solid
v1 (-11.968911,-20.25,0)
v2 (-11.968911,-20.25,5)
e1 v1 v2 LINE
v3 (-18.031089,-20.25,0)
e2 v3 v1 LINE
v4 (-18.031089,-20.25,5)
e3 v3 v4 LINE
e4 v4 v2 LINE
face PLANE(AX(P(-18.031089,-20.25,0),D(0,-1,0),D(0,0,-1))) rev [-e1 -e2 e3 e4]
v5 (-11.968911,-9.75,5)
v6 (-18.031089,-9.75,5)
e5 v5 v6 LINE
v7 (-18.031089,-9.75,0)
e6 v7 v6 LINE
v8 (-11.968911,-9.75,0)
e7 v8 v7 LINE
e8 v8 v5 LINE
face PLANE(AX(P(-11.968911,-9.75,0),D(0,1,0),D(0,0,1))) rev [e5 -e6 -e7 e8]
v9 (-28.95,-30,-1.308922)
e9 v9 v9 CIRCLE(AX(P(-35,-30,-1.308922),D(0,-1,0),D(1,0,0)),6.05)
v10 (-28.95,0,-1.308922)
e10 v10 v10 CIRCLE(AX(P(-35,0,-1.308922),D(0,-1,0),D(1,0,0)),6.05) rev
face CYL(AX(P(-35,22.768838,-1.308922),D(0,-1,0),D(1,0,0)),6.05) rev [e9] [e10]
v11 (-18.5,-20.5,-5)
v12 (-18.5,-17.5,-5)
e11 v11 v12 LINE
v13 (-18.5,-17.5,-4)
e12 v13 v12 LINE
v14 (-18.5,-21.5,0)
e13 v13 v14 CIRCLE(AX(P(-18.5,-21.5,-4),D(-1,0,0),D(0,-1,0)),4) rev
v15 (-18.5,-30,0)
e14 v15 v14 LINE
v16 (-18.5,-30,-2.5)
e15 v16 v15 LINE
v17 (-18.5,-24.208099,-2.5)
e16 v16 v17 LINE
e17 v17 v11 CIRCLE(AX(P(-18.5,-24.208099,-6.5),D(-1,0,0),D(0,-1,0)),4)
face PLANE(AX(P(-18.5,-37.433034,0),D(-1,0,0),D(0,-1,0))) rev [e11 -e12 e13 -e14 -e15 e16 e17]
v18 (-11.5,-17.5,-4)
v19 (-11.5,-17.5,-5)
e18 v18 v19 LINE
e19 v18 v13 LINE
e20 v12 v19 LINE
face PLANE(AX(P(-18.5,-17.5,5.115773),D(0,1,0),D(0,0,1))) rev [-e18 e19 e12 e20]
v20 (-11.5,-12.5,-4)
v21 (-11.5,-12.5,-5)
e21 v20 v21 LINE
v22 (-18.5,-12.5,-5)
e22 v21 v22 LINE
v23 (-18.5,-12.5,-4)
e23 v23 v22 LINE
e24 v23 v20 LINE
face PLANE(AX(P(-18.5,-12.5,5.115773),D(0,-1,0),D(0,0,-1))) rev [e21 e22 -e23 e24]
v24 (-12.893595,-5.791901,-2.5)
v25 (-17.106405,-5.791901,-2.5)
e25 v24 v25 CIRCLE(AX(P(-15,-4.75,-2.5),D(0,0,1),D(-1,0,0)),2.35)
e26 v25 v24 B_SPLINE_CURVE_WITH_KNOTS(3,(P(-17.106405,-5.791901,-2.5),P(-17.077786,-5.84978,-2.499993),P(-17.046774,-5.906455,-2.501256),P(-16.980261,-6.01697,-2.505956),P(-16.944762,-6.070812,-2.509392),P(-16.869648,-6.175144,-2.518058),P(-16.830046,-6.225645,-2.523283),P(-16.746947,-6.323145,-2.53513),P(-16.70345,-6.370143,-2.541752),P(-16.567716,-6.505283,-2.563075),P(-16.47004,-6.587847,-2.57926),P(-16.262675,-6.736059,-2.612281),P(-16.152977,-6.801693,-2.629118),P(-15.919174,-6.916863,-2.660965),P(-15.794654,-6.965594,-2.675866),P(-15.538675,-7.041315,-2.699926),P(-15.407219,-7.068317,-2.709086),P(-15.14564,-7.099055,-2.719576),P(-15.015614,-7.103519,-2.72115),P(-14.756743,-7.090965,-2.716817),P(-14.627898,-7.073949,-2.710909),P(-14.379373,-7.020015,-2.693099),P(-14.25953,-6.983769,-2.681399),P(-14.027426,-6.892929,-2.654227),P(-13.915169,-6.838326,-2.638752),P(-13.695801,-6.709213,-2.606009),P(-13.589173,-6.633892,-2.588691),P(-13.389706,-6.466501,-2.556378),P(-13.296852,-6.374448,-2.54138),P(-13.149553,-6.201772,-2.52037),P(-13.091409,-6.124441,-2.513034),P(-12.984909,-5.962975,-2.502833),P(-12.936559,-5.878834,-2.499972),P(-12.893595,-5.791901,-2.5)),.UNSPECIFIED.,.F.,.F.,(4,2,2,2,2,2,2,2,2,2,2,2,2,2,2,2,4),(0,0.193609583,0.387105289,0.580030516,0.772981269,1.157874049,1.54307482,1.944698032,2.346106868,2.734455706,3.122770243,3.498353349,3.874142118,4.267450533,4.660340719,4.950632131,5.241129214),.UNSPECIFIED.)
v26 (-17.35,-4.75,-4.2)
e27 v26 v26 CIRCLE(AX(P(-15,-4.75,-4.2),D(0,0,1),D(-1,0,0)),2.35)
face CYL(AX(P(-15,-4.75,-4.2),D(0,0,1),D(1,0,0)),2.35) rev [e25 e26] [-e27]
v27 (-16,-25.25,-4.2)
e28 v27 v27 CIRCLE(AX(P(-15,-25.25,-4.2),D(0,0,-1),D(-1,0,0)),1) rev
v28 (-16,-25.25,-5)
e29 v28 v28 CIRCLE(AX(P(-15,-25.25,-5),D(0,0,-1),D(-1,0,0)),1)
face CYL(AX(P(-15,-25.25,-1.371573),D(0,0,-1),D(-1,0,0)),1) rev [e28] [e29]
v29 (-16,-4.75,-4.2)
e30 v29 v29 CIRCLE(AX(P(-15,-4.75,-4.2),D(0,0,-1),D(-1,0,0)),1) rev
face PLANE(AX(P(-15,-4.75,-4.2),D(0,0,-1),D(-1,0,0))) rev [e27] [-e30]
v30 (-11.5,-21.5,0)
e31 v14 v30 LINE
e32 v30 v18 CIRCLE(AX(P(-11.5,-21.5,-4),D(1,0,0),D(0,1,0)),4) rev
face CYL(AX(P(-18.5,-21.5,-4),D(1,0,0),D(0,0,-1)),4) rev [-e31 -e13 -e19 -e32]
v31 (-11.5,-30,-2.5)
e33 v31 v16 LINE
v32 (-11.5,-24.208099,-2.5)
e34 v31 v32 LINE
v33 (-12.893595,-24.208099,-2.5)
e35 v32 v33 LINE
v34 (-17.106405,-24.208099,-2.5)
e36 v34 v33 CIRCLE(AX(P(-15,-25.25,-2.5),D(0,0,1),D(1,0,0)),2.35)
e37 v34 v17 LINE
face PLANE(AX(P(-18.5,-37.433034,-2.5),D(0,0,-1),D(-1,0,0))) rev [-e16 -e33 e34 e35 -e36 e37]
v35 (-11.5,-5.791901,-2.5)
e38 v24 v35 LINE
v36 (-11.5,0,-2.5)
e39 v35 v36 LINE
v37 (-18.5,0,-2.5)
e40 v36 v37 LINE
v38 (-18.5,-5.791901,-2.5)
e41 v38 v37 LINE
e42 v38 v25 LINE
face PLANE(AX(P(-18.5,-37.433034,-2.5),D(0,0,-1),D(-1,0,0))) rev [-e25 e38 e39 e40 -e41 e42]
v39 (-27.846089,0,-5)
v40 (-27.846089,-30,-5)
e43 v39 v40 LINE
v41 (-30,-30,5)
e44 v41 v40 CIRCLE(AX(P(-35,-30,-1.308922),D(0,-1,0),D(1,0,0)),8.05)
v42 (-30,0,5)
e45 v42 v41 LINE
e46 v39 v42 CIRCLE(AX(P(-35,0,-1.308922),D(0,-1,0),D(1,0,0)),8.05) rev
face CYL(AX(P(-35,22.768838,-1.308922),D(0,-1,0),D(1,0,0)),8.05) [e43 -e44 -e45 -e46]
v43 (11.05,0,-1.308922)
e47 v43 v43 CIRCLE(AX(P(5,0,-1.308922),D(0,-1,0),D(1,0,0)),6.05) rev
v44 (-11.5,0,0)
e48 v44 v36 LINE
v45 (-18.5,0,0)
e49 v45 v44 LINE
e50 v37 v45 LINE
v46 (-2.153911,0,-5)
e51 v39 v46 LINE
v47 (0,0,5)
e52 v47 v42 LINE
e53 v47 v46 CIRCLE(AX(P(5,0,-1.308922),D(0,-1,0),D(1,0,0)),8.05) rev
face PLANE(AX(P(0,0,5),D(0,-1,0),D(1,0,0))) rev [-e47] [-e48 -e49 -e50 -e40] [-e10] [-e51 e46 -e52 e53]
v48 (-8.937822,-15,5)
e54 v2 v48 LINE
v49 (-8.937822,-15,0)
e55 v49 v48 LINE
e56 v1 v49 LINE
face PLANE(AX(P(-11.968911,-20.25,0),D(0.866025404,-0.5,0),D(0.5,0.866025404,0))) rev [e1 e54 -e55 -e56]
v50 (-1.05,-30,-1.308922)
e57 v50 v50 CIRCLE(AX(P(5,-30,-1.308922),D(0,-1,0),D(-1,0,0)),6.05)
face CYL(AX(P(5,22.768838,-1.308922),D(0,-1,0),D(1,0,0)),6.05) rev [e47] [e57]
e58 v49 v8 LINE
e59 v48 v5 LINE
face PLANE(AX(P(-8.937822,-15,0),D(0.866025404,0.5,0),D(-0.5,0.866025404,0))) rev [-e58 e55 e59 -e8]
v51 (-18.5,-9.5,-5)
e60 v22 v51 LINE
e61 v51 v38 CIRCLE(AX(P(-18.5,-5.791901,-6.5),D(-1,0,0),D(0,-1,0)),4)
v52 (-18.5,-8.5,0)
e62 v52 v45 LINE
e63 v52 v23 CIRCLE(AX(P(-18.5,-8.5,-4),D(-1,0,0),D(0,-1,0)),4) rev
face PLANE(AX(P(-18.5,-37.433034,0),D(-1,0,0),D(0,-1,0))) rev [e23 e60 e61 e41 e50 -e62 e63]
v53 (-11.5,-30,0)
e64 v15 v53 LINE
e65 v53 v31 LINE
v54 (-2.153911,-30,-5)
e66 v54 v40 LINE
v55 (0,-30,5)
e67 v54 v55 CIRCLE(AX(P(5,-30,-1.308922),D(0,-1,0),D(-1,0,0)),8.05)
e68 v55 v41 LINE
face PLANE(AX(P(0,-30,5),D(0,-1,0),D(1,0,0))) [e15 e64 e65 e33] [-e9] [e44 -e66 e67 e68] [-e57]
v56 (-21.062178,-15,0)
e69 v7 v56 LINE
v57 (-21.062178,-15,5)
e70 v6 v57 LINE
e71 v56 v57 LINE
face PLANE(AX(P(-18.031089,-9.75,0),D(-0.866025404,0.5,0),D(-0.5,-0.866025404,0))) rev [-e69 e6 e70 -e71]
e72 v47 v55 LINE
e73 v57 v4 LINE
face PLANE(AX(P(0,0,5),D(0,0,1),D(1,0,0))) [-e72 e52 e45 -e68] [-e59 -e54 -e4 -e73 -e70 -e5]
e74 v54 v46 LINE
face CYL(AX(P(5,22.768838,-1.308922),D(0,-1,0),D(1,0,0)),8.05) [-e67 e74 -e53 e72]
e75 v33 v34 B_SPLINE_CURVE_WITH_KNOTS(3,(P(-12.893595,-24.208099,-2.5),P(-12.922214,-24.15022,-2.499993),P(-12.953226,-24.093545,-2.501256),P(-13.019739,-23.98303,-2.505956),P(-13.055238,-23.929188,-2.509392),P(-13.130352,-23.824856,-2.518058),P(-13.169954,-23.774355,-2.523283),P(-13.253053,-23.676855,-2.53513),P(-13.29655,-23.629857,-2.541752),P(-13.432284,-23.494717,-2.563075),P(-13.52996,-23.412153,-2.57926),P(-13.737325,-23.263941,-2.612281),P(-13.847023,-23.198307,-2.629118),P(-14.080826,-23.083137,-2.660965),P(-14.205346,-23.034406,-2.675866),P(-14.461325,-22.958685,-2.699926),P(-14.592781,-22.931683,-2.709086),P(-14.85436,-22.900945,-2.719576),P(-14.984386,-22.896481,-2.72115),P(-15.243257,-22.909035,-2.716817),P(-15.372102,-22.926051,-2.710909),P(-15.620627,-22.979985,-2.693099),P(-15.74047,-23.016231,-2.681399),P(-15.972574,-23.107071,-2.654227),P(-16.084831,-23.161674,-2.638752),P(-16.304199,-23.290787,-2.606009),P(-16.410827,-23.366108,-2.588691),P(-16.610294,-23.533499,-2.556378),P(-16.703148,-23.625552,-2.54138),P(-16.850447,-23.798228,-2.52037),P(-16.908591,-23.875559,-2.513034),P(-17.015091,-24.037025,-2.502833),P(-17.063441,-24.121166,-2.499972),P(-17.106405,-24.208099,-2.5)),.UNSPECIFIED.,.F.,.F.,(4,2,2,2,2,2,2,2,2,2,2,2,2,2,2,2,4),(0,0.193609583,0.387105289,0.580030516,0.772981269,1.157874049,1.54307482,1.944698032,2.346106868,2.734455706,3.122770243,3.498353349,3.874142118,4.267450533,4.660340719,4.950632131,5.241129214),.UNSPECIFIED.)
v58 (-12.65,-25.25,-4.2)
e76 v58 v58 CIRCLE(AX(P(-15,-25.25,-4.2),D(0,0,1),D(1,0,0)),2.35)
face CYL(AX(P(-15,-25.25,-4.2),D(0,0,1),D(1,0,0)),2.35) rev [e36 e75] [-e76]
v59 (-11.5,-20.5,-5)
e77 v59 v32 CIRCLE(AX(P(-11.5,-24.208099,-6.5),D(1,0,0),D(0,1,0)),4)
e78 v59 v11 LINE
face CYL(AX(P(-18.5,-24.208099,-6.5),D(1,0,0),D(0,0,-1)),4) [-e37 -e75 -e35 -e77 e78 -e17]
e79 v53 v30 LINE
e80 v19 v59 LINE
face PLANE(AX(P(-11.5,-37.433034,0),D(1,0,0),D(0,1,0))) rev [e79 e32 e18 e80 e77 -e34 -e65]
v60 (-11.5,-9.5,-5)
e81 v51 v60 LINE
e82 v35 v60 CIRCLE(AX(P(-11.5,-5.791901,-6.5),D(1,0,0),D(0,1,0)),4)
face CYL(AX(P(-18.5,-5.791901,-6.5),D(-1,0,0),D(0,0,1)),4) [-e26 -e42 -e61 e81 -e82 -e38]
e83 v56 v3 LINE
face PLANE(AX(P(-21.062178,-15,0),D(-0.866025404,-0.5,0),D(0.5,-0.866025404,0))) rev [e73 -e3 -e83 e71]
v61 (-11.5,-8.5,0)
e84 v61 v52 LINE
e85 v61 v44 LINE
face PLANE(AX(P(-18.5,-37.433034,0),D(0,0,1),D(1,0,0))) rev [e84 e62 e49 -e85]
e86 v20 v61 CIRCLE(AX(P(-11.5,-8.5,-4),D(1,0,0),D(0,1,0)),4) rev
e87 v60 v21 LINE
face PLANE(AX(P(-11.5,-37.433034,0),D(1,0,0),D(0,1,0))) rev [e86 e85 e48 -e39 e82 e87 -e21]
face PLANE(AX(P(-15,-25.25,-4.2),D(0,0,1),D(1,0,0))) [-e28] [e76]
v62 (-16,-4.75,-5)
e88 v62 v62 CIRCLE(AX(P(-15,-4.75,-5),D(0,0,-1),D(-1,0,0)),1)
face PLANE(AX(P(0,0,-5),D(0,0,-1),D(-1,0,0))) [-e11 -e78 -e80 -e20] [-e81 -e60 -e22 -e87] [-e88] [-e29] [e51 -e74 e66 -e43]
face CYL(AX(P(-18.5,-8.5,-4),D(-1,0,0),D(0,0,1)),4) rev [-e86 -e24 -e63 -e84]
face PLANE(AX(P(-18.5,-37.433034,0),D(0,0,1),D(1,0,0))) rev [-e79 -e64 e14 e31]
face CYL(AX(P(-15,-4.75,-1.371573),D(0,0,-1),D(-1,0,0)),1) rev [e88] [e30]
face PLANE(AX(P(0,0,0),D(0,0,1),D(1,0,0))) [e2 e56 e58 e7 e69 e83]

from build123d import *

# Parameters (mm, degrees)
SKICA1_W                 = 30
SKICA1_H                 = 30
P_IDAT_VYSUNUT_M1_DEPTH  = 5
SKICA2_W                 = 30
SKICA2_H                 = 30
P_IDAT_VYSUNUT_M2_DEPTH  = 5
ODEBRAT_VYSUNUT_M1_DEPTH = 30
ODEBRAT_VYSUNUT_M2_DEPTH = 30
SKICA7_W                 = 7
SKICA7_H                 = 2.5
ODEBRAT_VYSUNUT_M3_DEPTH = 30
SKICA10_R                = 8.05
SKICA10_R_2              = 6.05
P_IDAT_VYSUNUT_M7_DEPTH  = 30
SKICA13_W                = 7
SKICA13_H                = 3
ODEBRAT_VYSUNUT_M5_DEPTH = 2.5
SKICA15_R                = 2.35
ODEBRAT_VYSUNUT_M6_DEPTH = 1.7
SKICA16_W                = 3.5
SKICA16_H                = 5
P_IDAT_VYSUNUT_M8_DEPTH  = 5
ODEBRAT_VYSUNUT_M7_DEPTH = 0.8
ZAOBLIT1_R               = 4
ZAOBLIT2_R               = 4
ODEBRAT_VYSUNUT_M8_DEPTH = 5


with BuildPart() as part:
    # Skica1 → Přidat vysunutím1 (new body)
    with BuildSketch(Plane.XY):
        with Locations((-15, -15)):
            Rectangle(SKICA1_W, SKICA1_H)
    extrude(amount=P_IDAT_VYSUNUT_M1_DEPTH)

    # Skica2 → Přidat vysunutím2 (add)
    with BuildSketch(Plane(origin=(0, 0, 0), x_dir=(-1, 0, 0), z_dir=(0, 0, -1))):
        with Locations((15, -15)):
            Rectangle(SKICA2_W, SKICA2_H)
    extrude(amount=P_IDAT_VYSUNUT_M2_DEPTH)

    # Skica4 → Odebrat vysunutím1 (cut)
    with BuildSketch(Plane(origin=(0, -30, 0), x_dir=(-1, 0, 0), z_dir=(0, -1, 0))):
        with BuildLine():
            Line((30, -5), (30, 5))
            ThreePointArc((30, 5), (28.123635209, 0), (30, -5))
        make_face()
    extrude(amount=-ODEBRAT_VYSUNUT_M1_DEPTH, mode=Mode.SUBTRACT)

    # Skica5 → Odebrat vysunutím2 (cut)
    with BuildSketch(Plane(origin=(0, -30, 0), x_dir=(-1, 0, 0), z_dir=(0, -1, 0))):
        with BuildLine():
            ThreePointArc((0, -5), (1.909830056, 0), (0, 5))
            Line((0, 5), (0, -5))
        make_face()
    extrude(amount=-ODEBRAT_VYSUNUT_M2_DEPTH, mode=Mode.SUBTRACT)

    # Skica7 → Odebrat vysunutím3 (cut)
    with BuildSketch(Plane(origin=(0, 0, 0), x_dir=(1, 0, 0), z_dir=(0, 1, 0))):
        with Locations((-15, 1.25)):
            Rectangle(SKICA7_W, SKICA7_H)
    extrude(amount=-ODEBRAT_VYSUNUT_M3_DEPTH, mode=Mode.SUBTRACT)

    # Skica10 → Přidat vysunutím7 (add)
    # profile 1 of 2: a face of its own
    with BuildSketch(Plane.XZ.offset(30)):
        with Locations((-35, -1.308922253)):
            Circle(SKICA10_R)
        with Locations((-35, -1.308922253)):
            Circle(SKICA10_R_2, mode=Mode.SUBTRACT)
    # profile 2 of 2: a face of its own
    with BuildSketch(Plane.XZ.offset(30)):
        with Locations((5, -1.308922253)):
            Circle(SKICA10_R)
        with Locations((5, -1.308922253)):
            Circle(SKICA10_R_2, mode=Mode.SUBTRACT)
    extrude(amount=-P_IDAT_VYSUNUT_M7_DEPTH)

    # Skica13 → Odebrat vysunutím5 (cut)
    with BuildSketch(Plane(origin=(0, 0, -5), x_dir=(-1, 0, 0), z_dir=(0, 0, -1))):
        with Locations((15, -19)):
            Rectangle(SKICA13_W, SKICA13_H)
        with Locations((15, -11)):
            Rectangle(SKICA13_W, SKICA13_H)
    extrude(amount=-ODEBRAT_VYSUNUT_M5_DEPTH, mode=Mode.SUBTRACT)

    # Skica15 → Odebrat vysunutím6 (cut)
    with BuildSketch(Plane.XY.offset(-2.5)):
        with Locations((-15, -25.25)):
            Circle(SKICA15_R)
        with Locations(Location((-15, -4.75, 0), (0, 0, 180))):
            Circle(SKICA15_R)
    extrude(amount=-ODEBRAT_VYSUNUT_M6_DEPTH, mode=Mode.SUBTRACT)

    # Skica16 → Přidat vysunutím8 (add)
    with BuildSketch(Plane(origin=(0, 0, -5), x_dir=(-1, 0, 0), z_dir=(0, 0, -1))):
        with Locations((13.25, -15)):
            Rectangle(SKICA16_W, SKICA16_H)
        with Locations((16.75, -15)):
            Rectangle(SKICA16_W, SKICA16_H)
    extrude(amount=-P_IDAT_VYSUNUT_M8_DEPTH)

    # Skica16<3> → Odebrat vysunutím7 (cut)
    with BuildSketch(Plane(origin=(0, 0, -5), x_dir=(-1, 0, 0), z_dir=(0, 0, -1))):
        with BuildLine():
            ThreePointArc((16, -4.75), (15.707106781, -4.042893219), (15, -3.75))
            Line((15, -3.75), (15, -5.75))
            ThreePointArc((15, -5.75), (15.707106781, -5.457106781), (16, -4.75))
        make_face()
        with BuildLine():
            Line((15, -5.75), (15, -3.75))
            ThreePointArc((15, -3.75), (14, -4.75), (15, -5.75))
        make_face()
        with BuildLine():
            ThreePointArc((15, -24.25), (14, -25.25), (15, -26.25))
            Line((15, -26.25), (15, -24.25))
        make_face()
        with BuildLine():
            Line((15, -24.25), (15, -26.25))
            ThreePointArc((15, -26.25), (15.707106781, -25.957106781), (16, -25.25))
            ThreePointArc((16, -25.25), (15.707106781, -24.542893219), (15, -24.25))
        make_face()
    extrude(amount=-ODEBRAT_VYSUNUT_M7_DEPTH, mode=Mode.SUBTRACT)

    # Zaoblit1
    zaoblit1_edges = [part.edges().sort_by_distance(p)[0] for p in [
        (-15, -17.5, 0),
        (-15, -12.5, 0),
    ]]
    fillet(zaoblit1_edges, radius=ZAOBLIT1_R)

    # Zaoblit2
    # the kernel refuses this fillet: 4 mm, written as the material it takes off along each edge
    with BuildSketch(Plane(origin=(-18.5, -20.5, -2.5), x_dir=(0, 0, -1), z_dir=(1, 0, 0)), Plane(origin=(-11.5, -9.5, -2.5), x_dir=(0, 0, -1), z_dir=(-1, 0, 0))) as zaoblit2_piece_1:
        with BuildLine():
            CenterArc((4, -3.708099244), ZAOBLIT2_R, 112.024312837, 67.975687163)
            Line((0, -3.708099244), (-0.08, -3.708099244))
            Line((-0.08, -3.708099244), (-0.08, 0))
            Line((-0.08, 0), (0, 0.08))
            ThreePointArc((0, 0.08), (1.25, 0.08), (2.47, 0.074161985))
            Line((2.47, 0.074161985), (2.5, 0))
        make_face()
    extrude(amount=7, mode=Mode.SUBTRACT)

    # Skica17 → Odebrat vysunutím8 (cut)
    with BuildSketch(Plane.XY.offset(5)):
        Polygon((-8.937822174, -15), (-11.968911087, -9.75), (-18.031088913, -9.75), (-21.062177826, -15), (-18.031088913, -20.25), (-11.968911087, -20.25), align=None)
    extrude(amount=-ODEBRAT_VYSUNUT_M8_DEPTH, mode=Mode.SUBTRACT)


solid = part.part
